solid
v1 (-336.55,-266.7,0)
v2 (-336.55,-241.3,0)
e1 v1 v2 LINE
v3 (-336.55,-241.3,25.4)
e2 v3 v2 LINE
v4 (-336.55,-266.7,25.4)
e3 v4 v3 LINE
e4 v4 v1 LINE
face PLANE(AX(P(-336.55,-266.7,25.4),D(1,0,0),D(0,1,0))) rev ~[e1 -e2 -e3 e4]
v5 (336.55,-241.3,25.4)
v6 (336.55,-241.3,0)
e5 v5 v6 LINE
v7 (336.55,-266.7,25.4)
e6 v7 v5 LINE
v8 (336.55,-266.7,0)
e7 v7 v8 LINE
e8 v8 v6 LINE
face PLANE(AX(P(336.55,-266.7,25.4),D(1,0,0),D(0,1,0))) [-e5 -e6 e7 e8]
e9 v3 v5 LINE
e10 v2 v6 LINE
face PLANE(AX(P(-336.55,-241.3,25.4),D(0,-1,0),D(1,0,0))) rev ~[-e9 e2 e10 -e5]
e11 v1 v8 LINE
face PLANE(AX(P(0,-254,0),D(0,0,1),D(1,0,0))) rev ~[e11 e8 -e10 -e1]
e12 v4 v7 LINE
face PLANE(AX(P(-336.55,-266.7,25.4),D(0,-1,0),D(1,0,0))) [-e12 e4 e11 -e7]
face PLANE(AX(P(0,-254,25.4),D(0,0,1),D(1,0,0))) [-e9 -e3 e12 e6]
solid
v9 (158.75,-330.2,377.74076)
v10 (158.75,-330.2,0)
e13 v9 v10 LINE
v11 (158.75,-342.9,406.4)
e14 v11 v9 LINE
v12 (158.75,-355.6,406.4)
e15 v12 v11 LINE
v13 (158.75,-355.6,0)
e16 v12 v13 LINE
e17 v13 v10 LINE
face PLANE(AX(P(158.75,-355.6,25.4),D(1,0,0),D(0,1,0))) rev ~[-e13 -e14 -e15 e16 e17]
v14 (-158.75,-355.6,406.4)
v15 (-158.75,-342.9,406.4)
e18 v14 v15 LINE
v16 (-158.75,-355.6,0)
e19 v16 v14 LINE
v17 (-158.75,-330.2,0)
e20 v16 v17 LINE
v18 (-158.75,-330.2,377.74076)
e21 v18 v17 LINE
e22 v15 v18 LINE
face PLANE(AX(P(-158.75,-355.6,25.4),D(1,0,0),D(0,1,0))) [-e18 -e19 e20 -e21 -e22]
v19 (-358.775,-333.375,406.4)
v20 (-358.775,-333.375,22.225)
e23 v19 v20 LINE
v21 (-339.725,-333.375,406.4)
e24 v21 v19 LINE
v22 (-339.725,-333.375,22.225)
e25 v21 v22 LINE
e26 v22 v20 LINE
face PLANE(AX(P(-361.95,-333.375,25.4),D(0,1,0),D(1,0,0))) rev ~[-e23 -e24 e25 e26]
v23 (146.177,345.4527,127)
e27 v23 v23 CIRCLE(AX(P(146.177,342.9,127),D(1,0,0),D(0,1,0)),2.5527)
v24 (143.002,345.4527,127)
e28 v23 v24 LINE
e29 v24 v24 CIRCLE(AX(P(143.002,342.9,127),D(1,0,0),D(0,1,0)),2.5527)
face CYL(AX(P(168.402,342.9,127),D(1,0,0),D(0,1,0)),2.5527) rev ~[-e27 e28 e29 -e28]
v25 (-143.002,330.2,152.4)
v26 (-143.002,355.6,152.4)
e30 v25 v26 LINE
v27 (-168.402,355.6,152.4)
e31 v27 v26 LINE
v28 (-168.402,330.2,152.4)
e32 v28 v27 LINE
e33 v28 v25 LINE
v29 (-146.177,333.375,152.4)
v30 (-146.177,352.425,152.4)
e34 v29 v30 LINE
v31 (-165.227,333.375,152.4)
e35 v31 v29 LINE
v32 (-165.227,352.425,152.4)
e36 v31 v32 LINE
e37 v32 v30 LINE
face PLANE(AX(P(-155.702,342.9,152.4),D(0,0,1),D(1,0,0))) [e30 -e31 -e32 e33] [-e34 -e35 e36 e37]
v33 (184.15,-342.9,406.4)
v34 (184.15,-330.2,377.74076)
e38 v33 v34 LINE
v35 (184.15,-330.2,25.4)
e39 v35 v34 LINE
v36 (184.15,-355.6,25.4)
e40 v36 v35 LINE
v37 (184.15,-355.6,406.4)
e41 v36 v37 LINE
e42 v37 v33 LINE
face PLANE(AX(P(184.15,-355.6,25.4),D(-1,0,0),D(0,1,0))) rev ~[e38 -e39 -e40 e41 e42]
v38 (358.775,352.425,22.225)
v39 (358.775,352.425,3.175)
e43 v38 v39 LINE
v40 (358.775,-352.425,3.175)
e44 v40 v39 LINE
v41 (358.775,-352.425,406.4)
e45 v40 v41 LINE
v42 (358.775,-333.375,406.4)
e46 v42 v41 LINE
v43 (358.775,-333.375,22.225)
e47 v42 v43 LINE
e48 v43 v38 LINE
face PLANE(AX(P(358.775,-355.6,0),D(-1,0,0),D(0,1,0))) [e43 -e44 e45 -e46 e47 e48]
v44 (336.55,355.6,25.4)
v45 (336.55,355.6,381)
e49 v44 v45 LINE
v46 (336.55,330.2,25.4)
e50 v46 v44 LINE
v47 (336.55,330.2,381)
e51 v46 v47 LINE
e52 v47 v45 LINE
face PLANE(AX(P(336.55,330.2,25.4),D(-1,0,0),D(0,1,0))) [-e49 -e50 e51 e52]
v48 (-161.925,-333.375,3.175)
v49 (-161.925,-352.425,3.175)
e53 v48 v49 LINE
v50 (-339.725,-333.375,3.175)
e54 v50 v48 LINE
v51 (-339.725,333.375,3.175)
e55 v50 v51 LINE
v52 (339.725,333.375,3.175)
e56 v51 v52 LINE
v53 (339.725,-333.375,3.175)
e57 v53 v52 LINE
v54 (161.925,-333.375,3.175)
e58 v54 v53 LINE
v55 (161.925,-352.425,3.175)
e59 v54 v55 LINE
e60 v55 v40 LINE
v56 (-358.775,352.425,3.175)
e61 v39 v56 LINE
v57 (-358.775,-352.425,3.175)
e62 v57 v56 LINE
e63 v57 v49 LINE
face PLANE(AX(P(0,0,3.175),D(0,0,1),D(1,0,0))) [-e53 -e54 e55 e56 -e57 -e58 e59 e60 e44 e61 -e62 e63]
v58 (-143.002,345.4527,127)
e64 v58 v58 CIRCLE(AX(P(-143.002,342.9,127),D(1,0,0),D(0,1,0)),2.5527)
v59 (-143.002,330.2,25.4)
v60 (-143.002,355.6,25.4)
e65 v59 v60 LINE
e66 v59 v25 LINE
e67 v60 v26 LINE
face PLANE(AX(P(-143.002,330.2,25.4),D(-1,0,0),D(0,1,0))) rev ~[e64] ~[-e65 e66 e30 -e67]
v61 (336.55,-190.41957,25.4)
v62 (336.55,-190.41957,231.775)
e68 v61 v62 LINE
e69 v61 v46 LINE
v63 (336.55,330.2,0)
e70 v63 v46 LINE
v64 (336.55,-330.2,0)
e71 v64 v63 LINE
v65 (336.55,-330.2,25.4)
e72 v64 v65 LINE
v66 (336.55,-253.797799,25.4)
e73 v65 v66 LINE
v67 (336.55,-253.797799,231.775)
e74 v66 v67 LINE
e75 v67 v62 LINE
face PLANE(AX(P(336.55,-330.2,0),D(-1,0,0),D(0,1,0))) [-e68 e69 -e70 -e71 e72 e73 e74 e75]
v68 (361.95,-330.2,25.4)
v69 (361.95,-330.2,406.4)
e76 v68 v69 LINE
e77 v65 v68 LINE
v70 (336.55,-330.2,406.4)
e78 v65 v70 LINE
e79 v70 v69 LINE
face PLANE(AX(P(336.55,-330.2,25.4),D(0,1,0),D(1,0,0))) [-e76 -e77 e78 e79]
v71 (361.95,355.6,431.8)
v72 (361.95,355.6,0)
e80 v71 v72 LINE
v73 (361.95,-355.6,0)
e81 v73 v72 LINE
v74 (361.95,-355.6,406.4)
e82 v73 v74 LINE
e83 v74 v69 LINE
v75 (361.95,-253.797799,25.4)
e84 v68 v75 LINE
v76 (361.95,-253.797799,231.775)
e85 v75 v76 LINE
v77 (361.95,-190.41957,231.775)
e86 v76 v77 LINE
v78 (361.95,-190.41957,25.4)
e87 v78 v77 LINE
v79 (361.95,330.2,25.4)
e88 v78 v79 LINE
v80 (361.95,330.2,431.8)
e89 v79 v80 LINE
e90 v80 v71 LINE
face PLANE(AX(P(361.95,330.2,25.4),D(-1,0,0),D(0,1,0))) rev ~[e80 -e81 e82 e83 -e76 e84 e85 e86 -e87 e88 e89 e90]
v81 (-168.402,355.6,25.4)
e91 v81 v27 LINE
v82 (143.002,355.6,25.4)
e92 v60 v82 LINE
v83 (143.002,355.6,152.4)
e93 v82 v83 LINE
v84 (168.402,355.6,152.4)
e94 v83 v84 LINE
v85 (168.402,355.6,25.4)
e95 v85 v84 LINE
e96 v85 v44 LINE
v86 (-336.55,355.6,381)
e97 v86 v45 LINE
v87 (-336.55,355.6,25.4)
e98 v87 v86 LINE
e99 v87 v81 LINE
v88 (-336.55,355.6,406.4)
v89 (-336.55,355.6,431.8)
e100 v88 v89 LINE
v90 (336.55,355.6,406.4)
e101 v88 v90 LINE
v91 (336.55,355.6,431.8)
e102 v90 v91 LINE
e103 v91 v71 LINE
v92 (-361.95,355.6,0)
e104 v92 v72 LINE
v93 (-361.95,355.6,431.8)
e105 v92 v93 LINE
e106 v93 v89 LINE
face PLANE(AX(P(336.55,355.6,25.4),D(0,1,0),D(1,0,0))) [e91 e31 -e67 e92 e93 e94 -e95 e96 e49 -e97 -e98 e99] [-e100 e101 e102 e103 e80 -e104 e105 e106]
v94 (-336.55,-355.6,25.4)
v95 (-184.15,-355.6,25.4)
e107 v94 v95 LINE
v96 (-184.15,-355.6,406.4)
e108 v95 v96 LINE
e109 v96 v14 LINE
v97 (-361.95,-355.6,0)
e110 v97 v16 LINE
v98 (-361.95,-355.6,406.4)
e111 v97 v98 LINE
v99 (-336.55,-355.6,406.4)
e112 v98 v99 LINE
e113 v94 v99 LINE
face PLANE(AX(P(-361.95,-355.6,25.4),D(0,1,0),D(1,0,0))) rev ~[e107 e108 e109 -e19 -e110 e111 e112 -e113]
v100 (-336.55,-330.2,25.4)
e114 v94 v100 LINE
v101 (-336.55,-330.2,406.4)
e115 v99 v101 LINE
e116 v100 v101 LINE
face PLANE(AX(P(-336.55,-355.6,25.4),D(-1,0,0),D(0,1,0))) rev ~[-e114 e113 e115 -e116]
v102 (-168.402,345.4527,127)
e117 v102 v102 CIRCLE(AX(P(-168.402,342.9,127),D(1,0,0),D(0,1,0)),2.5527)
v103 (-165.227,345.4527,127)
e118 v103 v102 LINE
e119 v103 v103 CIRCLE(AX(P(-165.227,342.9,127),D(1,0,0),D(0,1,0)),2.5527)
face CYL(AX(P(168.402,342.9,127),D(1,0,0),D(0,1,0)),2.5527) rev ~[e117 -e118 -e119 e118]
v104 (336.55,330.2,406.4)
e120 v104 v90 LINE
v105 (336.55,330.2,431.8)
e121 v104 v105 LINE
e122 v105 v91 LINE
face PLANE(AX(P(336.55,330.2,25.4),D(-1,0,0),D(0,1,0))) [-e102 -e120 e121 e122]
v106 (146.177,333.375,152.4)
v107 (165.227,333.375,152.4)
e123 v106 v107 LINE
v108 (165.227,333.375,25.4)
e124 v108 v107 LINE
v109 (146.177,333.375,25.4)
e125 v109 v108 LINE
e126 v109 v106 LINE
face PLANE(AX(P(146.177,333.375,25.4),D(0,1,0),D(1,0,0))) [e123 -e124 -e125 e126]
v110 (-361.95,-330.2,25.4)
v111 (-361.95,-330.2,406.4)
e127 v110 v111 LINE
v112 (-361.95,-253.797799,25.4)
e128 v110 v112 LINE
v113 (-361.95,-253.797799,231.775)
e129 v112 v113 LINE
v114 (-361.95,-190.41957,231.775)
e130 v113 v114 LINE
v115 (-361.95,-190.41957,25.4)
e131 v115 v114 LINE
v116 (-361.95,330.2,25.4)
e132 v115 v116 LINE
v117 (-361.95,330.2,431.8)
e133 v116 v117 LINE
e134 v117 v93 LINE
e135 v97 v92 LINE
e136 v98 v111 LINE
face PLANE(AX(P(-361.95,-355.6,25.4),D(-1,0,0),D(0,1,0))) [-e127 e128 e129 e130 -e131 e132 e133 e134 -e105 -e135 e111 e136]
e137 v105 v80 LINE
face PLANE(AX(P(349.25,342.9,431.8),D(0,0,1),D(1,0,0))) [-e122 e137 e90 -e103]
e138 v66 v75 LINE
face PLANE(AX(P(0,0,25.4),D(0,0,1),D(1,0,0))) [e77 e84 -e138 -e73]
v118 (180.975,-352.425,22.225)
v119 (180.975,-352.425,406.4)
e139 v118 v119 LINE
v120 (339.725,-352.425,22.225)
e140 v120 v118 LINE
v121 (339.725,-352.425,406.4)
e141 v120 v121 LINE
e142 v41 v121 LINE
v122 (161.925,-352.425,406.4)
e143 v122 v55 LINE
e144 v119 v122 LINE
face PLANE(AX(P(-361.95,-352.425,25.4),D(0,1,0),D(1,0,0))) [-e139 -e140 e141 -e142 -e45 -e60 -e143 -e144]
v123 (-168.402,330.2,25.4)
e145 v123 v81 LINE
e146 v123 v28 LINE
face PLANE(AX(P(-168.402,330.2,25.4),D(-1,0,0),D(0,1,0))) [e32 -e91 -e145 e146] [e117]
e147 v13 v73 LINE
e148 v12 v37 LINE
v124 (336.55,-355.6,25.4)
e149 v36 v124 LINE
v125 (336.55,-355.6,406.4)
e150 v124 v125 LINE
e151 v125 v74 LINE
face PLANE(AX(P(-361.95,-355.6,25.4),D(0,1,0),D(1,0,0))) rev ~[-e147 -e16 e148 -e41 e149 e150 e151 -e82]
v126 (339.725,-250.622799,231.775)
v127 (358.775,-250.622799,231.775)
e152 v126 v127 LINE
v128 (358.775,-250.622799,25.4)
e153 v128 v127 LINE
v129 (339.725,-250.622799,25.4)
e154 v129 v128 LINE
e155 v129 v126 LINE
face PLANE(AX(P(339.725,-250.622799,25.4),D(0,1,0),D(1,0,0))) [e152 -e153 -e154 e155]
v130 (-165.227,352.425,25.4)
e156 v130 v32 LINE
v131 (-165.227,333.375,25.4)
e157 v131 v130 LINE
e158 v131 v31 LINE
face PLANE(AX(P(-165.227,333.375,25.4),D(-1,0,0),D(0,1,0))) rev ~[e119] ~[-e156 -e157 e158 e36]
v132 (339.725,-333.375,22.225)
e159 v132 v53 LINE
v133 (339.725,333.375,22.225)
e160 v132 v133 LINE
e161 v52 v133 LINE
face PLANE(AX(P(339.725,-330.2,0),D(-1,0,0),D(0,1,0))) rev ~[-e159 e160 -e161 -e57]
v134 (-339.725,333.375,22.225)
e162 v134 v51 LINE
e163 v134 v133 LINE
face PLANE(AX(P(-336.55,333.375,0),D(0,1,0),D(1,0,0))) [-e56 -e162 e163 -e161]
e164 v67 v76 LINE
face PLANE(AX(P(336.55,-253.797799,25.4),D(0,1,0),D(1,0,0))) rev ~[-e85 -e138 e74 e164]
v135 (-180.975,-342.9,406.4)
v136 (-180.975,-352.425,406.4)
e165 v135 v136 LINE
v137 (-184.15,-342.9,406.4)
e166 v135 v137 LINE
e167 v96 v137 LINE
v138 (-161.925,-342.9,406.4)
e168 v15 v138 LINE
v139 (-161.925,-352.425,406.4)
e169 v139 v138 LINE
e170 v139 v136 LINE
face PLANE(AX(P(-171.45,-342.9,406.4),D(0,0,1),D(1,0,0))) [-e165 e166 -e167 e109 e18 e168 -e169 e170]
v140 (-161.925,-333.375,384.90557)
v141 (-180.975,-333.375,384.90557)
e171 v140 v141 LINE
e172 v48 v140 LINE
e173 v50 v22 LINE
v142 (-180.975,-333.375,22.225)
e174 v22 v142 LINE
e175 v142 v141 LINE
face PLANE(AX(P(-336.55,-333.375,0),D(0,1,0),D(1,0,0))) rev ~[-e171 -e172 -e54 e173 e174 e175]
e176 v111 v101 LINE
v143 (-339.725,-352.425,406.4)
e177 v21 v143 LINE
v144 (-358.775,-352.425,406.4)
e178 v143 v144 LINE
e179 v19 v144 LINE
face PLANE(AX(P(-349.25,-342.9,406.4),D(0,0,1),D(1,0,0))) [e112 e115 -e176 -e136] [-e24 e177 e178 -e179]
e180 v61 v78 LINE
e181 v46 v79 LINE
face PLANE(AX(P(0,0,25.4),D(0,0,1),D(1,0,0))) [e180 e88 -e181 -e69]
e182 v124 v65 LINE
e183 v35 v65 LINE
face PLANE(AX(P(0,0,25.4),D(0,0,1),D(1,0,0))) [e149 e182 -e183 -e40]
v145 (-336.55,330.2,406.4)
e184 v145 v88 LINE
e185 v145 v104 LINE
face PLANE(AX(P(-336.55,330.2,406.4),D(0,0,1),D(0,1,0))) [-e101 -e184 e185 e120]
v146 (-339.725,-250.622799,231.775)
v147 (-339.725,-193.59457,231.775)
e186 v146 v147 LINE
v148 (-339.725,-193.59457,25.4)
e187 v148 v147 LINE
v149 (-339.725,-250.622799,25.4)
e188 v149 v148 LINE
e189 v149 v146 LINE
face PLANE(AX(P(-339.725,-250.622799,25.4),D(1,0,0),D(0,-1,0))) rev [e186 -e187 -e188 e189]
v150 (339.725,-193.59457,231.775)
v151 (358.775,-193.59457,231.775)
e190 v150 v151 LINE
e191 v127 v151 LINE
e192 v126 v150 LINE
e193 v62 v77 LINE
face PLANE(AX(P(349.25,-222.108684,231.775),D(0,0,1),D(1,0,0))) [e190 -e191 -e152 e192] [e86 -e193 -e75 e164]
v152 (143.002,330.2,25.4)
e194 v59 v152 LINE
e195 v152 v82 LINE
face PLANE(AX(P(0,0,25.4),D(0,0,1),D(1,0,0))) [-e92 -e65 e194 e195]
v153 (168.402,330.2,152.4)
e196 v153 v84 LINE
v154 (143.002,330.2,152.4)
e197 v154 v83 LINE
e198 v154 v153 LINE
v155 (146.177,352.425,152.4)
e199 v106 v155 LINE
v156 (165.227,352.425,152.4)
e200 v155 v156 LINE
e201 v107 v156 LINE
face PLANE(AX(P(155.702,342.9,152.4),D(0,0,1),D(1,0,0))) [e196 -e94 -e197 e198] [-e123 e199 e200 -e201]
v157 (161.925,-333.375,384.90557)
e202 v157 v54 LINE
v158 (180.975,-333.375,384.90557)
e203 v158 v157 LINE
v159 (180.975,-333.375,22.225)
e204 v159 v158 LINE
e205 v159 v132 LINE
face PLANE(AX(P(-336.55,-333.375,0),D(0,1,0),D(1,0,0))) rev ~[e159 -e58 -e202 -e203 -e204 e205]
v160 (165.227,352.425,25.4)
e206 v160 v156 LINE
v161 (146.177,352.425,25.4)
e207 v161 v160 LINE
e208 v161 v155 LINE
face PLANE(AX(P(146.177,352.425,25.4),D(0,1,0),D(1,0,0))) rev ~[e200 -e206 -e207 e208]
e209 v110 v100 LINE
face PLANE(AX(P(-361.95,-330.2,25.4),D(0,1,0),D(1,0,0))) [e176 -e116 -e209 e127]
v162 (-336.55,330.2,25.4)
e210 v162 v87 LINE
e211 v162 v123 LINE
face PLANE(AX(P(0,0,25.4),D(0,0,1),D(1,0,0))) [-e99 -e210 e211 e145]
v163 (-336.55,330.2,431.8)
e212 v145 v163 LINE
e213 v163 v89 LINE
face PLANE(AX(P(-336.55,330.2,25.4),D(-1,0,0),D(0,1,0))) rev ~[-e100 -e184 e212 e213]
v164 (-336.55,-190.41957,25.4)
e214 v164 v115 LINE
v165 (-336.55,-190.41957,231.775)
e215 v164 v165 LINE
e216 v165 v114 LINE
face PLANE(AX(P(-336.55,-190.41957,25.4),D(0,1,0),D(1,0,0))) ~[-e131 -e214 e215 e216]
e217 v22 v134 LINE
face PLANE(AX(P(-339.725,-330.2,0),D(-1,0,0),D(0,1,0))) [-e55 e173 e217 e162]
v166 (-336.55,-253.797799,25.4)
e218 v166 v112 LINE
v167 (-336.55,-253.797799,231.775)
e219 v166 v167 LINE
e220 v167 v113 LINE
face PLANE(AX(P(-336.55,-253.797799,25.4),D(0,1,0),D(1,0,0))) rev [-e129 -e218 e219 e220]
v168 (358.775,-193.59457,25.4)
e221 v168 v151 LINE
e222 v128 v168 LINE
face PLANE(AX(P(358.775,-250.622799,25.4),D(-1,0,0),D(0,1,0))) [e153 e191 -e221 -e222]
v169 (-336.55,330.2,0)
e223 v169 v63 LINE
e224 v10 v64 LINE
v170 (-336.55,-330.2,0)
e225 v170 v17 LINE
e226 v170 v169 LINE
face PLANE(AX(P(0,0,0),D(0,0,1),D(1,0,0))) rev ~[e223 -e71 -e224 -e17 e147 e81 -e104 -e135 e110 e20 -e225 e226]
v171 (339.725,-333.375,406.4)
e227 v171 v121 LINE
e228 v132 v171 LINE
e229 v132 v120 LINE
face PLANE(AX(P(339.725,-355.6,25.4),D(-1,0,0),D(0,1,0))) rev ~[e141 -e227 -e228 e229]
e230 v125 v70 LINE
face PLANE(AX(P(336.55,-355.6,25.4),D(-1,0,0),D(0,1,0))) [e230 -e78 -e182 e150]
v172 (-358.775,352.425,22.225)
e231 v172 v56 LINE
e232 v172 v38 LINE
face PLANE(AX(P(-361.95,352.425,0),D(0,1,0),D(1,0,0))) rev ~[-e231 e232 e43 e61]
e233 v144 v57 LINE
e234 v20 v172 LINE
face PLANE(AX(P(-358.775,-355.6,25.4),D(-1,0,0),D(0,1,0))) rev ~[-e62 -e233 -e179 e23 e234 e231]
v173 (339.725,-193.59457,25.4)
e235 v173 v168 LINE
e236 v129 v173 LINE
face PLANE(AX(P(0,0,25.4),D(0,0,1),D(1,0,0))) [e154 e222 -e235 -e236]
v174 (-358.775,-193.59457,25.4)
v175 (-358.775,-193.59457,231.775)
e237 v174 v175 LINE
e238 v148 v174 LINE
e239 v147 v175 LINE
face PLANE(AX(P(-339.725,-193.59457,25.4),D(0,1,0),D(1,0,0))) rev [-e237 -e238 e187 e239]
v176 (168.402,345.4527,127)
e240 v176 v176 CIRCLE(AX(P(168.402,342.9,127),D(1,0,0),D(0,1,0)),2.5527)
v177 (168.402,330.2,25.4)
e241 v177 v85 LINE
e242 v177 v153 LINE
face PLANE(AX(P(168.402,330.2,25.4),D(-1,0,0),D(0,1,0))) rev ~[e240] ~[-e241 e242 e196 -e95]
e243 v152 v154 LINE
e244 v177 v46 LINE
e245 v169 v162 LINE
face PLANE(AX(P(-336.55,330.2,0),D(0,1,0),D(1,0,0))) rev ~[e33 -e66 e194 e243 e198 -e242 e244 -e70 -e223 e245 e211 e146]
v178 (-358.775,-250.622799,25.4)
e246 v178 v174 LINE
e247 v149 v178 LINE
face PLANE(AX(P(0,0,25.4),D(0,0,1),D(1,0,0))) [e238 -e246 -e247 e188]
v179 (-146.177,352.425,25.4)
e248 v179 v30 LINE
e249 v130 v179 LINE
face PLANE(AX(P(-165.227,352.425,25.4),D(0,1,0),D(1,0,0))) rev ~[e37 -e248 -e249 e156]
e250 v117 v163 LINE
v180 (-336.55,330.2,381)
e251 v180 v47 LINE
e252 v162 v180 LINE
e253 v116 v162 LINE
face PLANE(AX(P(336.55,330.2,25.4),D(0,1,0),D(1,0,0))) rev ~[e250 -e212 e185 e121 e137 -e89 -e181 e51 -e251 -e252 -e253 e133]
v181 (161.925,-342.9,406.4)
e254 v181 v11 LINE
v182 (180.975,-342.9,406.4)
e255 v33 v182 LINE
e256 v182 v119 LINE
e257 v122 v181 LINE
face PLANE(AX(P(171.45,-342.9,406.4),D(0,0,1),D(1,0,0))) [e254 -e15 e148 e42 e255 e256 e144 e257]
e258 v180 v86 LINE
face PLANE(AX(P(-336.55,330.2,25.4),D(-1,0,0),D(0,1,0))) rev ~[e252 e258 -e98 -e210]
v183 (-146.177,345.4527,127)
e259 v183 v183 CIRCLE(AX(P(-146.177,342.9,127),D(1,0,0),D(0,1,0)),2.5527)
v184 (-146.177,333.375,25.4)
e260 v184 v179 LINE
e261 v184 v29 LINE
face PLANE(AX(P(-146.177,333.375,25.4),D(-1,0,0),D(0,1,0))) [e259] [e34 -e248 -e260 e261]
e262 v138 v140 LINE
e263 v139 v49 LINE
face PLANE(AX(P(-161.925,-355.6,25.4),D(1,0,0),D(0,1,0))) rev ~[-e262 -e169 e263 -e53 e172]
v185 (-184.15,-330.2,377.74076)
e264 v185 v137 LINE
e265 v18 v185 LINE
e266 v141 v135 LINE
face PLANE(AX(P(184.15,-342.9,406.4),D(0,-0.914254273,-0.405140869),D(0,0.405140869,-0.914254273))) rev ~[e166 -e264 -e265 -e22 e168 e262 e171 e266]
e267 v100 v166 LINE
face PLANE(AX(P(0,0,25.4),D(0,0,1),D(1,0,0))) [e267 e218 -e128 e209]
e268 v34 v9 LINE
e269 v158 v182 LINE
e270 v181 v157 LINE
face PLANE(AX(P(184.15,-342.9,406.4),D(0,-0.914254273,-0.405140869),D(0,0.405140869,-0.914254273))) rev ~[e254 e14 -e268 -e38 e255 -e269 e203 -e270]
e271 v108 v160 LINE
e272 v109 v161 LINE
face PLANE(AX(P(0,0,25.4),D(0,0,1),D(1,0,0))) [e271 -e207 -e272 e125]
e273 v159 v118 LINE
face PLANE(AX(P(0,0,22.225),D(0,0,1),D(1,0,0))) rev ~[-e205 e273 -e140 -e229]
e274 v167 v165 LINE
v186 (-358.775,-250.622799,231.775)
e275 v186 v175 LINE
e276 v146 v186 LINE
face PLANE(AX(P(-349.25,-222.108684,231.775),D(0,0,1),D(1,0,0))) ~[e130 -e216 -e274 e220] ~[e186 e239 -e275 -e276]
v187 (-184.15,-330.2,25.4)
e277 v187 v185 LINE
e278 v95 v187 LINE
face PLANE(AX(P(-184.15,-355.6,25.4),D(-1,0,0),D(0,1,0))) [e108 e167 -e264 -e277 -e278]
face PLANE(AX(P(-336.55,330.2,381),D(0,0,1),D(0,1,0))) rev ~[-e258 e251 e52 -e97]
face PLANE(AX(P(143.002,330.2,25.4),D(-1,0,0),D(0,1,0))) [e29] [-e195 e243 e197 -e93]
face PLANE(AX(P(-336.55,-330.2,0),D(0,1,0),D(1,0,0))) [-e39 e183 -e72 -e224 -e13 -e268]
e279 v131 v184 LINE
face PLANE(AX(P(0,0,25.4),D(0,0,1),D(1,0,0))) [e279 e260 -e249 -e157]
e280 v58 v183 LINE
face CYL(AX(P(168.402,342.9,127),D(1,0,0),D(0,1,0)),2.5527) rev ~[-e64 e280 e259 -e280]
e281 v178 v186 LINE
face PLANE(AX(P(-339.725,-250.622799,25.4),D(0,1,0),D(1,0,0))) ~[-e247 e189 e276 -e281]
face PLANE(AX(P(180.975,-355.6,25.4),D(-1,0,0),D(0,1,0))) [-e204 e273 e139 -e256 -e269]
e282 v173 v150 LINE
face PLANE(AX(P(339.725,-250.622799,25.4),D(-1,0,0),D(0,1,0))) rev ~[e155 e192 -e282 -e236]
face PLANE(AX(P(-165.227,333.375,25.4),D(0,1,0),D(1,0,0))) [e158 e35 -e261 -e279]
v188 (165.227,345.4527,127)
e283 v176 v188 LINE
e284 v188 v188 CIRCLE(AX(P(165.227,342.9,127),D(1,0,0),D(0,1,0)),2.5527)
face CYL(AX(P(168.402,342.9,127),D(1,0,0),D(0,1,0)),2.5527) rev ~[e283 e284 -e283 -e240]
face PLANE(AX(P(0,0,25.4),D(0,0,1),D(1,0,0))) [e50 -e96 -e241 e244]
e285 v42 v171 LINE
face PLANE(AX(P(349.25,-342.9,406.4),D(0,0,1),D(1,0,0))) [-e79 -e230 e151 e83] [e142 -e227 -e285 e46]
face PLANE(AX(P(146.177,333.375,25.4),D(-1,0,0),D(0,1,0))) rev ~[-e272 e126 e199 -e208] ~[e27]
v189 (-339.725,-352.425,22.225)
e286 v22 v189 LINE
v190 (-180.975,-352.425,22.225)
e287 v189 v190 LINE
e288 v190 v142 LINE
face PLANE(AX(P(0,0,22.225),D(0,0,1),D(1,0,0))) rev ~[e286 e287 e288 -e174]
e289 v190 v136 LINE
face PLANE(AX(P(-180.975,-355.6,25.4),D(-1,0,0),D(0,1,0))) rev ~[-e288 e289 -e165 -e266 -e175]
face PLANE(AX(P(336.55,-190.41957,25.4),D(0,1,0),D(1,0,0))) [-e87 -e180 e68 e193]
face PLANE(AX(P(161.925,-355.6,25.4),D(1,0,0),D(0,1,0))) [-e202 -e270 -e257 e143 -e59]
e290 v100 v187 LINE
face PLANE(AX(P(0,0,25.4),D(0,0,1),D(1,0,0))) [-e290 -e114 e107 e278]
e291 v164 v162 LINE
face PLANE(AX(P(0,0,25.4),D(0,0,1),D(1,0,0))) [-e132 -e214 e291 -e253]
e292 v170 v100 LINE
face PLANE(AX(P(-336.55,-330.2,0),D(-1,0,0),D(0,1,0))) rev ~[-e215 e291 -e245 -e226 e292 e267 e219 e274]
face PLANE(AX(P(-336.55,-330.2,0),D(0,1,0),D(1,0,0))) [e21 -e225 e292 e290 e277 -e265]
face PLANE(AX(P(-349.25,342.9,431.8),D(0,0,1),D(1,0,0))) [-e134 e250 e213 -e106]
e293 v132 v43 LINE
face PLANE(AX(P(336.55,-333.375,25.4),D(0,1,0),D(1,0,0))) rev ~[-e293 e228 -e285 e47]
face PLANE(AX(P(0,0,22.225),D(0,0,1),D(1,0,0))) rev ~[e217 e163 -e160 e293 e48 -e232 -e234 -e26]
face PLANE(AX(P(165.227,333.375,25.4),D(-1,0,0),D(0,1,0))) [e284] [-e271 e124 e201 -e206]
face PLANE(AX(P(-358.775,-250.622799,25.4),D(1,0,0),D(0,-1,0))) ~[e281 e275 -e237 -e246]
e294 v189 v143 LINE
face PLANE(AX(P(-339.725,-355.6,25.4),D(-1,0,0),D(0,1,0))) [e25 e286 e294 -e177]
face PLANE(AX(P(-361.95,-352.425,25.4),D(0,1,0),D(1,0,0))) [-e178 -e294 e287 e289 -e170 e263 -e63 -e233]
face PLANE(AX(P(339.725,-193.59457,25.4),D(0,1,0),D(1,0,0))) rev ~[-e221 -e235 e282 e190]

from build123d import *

# Parameters (mm, degrees)
F0_W      = 723.9
F0_H      = 711.2
F0_W_2    = 673.1
F0_H_2    = 660.4
F1_DEPTH  = 25.4
F2_W      = 25.4
F2_H      = 25.4
F3_DEPTH  = 381
F4_W      = 25.4
F4_H      = 25.4
F5_DEPTH  = 381
F6_W      = 673.1
F6_H      = 25.4
F7_DEPTH  = 25.4
F8_W      = 317.5
F8_H      = 25.4
F9_DEPTH  = 25.4
F10_T     = -3.175
F11_W     = 25.4
F11_H     = 25.4
F12_DEPTH = 406.4
F13_W     = 25.4
F13_H     = 25.4
F14_DEPTH = 673.1
F15_W     = 25.4
F15_H     = 63.3782297373
F15_W_2   = 19.05
F15_H_2   = 57.0282297373
F16_DEPTH = 206.375
F17_W     = 25.4
F17_H     = 25.4
F17_W_2   = 19.05
F17_H_2   = 19.05
F18_DEPTH = 127
F20_D     = 5.1054
F20_DEPTH = 406.4
F20_TIP   = 1.5338169022
F22_DEPTH = 406.4


# Not quite as in the source:
# - a pattern or mirror of a feature is missing from the dataset's text; its kind, count and spacing are read off the source's solid


with BuildPart() as f1:
    # F0 (on Top) → F1 (new body)
    with BuildSketch(Plane.XY):
        Rectangle(F0_W, F0_H)
        Rectangle(F0_W_2, F0_H_2, mode=Mode.SUBTRACT)
    extrude(amount=F1_DEPTH)

    # F2 (on face) → F3 (join)
    with BuildSketch(Plane.XY.offset(25.4)):
        with Locations((-349.25, -342.9)):
            Rectangle(F2_W, F2_H)
        with Locations((349.25, -342.9)):
            Rectangle(F2_W, F2_H)
    extrude(amount=F3_DEPTH)

    # F4 (on face) → F5 (join)
    with BuildSketch(Plane.XY.offset(25.4)):
        with Locations((-171.45, -342.9)):
            Rectangle(F4_W, F4_H)
        with Locations((171.45, -342.9)):
            Rectangle(F4_W, F4_H)
    extrude(amount=F5_DEPTH)

    # F8 (on face) → F9 (cut)
    with BuildSketch(Plane.XY.offset(25.4)):
        with Locations((0, -342.9)):
            Rectangle(F8_W, F8_H)
    extrude(amount=-F9_DEPTH, mode=Mode.SUBTRACT)

    # F10
    f10_openings = [f1.faces().sort_by_distance(p)[0] for p in [
        (-349.25, -342.9, 406.4),
        (-171.45, -342.9, 406.4),
        (171.45, -342.9, 406.4),
        (349.25, -342.9, 406.4),
    ]]
    offset(amount=F10_T, openings=f10_openings, kind=Kind.INTERSECTION)

    # F11 (on face) → F12 (join)
    with BuildSketch(Plane.XY.offset(25.4)):
        with Locations((349.25, 342.9)):
            Rectangle(F11_W, F11_H)
        with Locations((-349.25, 342.9)):
            Rectangle(F11_W, F11_H)
    extrude(amount=F12_DEPTH)

    # F13 (on face) → F14 (join)
    with BuildSketch(Plane.YZ.offset(-336.55)):
        with Locations((342.9, 393.7)):
            Rectangle(F13_W, F13_H)
    extrude(amount=F14_DEPTH)

    # F15 (on face) → F16 (join)
    with BuildSketch(Plane.XY.offset(25.4)):
        with Locations((349.25, -222.1086844802)):
            Rectangle(F15_W, F15_H)
        with Locations((349.25, -222.1086844802)):
            Rectangle(F15_W_2, F15_H_2, mode=Mode.SUBTRACT)
    f16 = extrude(amount=F16_DEPTH)

    # F16_copies: F16 across plane
    add(f16.mirror(Plane(origin=(0, 0, 0), x_dir=(0, 0, -1), z_dir=(-1, 0, 0))))

    # F17 (on face) → F18 (join)
    with BuildSketch(Plane.XY.offset(25.4)):
        with Locations((-155.702, 342.9)):
            Rectangle(F17_W, F17_H)
        with Locations((-155.702, 342.9)):
            Rectangle(F17_W_2, F17_H_2, mode=Mode.SUBTRACT)
        with Locations((155.702, 342.9)):
            Rectangle(F17_W, F17_H)
        with Locations((155.702, 342.9)):
            Rectangle(F17_W_2, F17_H_2, mode=Mode.SUBTRACT)
    extrude(amount=F18_DEPTH)

    # F20 (one way)
    with BuildSketch(Plane.YZ.offset(168.402)):
        with Locations((342.9, 127)):
            Circle(F20_D / 2)
    extrude(amount=-F20_DEPTH, mode=Mode.SUBTRACT)
    with Locations(Plane.YZ.offset(168.402)):
        with Locations((342.9, 127)):
            with Locations((0, 0, -(F20_DEPTH + F20_TIP / 2))):  # 118° drill point
                Cone(0, F20_D / 2, F20_TIP, mode=Mode.SUBTRACT)

    # F21 (on face) → F22 (cut)
    with BuildSketch(Plane.YZ.offset(184.15)):
        Polygon((-351.5427708626, 424.6743917465), (-342.9, 406.4), (-303.1188249588, 316.628485918), (-308.5665404797, 412.8710329533), align=None)
    extrude(amount=-F22_DEPTH, mode=Mode.SUBTRACT)


with BuildPart() as f7:
    # F6 (on face) → F7 (new body)
    with BuildSketch(Plane.XY.offset(25.4)):
        with Locations((0, -254)):
            Rectangle(F6_W, F6_H)
    extrude(amount=-F7_DEPTH)


solid = Compound([f1.part, f7.part])
